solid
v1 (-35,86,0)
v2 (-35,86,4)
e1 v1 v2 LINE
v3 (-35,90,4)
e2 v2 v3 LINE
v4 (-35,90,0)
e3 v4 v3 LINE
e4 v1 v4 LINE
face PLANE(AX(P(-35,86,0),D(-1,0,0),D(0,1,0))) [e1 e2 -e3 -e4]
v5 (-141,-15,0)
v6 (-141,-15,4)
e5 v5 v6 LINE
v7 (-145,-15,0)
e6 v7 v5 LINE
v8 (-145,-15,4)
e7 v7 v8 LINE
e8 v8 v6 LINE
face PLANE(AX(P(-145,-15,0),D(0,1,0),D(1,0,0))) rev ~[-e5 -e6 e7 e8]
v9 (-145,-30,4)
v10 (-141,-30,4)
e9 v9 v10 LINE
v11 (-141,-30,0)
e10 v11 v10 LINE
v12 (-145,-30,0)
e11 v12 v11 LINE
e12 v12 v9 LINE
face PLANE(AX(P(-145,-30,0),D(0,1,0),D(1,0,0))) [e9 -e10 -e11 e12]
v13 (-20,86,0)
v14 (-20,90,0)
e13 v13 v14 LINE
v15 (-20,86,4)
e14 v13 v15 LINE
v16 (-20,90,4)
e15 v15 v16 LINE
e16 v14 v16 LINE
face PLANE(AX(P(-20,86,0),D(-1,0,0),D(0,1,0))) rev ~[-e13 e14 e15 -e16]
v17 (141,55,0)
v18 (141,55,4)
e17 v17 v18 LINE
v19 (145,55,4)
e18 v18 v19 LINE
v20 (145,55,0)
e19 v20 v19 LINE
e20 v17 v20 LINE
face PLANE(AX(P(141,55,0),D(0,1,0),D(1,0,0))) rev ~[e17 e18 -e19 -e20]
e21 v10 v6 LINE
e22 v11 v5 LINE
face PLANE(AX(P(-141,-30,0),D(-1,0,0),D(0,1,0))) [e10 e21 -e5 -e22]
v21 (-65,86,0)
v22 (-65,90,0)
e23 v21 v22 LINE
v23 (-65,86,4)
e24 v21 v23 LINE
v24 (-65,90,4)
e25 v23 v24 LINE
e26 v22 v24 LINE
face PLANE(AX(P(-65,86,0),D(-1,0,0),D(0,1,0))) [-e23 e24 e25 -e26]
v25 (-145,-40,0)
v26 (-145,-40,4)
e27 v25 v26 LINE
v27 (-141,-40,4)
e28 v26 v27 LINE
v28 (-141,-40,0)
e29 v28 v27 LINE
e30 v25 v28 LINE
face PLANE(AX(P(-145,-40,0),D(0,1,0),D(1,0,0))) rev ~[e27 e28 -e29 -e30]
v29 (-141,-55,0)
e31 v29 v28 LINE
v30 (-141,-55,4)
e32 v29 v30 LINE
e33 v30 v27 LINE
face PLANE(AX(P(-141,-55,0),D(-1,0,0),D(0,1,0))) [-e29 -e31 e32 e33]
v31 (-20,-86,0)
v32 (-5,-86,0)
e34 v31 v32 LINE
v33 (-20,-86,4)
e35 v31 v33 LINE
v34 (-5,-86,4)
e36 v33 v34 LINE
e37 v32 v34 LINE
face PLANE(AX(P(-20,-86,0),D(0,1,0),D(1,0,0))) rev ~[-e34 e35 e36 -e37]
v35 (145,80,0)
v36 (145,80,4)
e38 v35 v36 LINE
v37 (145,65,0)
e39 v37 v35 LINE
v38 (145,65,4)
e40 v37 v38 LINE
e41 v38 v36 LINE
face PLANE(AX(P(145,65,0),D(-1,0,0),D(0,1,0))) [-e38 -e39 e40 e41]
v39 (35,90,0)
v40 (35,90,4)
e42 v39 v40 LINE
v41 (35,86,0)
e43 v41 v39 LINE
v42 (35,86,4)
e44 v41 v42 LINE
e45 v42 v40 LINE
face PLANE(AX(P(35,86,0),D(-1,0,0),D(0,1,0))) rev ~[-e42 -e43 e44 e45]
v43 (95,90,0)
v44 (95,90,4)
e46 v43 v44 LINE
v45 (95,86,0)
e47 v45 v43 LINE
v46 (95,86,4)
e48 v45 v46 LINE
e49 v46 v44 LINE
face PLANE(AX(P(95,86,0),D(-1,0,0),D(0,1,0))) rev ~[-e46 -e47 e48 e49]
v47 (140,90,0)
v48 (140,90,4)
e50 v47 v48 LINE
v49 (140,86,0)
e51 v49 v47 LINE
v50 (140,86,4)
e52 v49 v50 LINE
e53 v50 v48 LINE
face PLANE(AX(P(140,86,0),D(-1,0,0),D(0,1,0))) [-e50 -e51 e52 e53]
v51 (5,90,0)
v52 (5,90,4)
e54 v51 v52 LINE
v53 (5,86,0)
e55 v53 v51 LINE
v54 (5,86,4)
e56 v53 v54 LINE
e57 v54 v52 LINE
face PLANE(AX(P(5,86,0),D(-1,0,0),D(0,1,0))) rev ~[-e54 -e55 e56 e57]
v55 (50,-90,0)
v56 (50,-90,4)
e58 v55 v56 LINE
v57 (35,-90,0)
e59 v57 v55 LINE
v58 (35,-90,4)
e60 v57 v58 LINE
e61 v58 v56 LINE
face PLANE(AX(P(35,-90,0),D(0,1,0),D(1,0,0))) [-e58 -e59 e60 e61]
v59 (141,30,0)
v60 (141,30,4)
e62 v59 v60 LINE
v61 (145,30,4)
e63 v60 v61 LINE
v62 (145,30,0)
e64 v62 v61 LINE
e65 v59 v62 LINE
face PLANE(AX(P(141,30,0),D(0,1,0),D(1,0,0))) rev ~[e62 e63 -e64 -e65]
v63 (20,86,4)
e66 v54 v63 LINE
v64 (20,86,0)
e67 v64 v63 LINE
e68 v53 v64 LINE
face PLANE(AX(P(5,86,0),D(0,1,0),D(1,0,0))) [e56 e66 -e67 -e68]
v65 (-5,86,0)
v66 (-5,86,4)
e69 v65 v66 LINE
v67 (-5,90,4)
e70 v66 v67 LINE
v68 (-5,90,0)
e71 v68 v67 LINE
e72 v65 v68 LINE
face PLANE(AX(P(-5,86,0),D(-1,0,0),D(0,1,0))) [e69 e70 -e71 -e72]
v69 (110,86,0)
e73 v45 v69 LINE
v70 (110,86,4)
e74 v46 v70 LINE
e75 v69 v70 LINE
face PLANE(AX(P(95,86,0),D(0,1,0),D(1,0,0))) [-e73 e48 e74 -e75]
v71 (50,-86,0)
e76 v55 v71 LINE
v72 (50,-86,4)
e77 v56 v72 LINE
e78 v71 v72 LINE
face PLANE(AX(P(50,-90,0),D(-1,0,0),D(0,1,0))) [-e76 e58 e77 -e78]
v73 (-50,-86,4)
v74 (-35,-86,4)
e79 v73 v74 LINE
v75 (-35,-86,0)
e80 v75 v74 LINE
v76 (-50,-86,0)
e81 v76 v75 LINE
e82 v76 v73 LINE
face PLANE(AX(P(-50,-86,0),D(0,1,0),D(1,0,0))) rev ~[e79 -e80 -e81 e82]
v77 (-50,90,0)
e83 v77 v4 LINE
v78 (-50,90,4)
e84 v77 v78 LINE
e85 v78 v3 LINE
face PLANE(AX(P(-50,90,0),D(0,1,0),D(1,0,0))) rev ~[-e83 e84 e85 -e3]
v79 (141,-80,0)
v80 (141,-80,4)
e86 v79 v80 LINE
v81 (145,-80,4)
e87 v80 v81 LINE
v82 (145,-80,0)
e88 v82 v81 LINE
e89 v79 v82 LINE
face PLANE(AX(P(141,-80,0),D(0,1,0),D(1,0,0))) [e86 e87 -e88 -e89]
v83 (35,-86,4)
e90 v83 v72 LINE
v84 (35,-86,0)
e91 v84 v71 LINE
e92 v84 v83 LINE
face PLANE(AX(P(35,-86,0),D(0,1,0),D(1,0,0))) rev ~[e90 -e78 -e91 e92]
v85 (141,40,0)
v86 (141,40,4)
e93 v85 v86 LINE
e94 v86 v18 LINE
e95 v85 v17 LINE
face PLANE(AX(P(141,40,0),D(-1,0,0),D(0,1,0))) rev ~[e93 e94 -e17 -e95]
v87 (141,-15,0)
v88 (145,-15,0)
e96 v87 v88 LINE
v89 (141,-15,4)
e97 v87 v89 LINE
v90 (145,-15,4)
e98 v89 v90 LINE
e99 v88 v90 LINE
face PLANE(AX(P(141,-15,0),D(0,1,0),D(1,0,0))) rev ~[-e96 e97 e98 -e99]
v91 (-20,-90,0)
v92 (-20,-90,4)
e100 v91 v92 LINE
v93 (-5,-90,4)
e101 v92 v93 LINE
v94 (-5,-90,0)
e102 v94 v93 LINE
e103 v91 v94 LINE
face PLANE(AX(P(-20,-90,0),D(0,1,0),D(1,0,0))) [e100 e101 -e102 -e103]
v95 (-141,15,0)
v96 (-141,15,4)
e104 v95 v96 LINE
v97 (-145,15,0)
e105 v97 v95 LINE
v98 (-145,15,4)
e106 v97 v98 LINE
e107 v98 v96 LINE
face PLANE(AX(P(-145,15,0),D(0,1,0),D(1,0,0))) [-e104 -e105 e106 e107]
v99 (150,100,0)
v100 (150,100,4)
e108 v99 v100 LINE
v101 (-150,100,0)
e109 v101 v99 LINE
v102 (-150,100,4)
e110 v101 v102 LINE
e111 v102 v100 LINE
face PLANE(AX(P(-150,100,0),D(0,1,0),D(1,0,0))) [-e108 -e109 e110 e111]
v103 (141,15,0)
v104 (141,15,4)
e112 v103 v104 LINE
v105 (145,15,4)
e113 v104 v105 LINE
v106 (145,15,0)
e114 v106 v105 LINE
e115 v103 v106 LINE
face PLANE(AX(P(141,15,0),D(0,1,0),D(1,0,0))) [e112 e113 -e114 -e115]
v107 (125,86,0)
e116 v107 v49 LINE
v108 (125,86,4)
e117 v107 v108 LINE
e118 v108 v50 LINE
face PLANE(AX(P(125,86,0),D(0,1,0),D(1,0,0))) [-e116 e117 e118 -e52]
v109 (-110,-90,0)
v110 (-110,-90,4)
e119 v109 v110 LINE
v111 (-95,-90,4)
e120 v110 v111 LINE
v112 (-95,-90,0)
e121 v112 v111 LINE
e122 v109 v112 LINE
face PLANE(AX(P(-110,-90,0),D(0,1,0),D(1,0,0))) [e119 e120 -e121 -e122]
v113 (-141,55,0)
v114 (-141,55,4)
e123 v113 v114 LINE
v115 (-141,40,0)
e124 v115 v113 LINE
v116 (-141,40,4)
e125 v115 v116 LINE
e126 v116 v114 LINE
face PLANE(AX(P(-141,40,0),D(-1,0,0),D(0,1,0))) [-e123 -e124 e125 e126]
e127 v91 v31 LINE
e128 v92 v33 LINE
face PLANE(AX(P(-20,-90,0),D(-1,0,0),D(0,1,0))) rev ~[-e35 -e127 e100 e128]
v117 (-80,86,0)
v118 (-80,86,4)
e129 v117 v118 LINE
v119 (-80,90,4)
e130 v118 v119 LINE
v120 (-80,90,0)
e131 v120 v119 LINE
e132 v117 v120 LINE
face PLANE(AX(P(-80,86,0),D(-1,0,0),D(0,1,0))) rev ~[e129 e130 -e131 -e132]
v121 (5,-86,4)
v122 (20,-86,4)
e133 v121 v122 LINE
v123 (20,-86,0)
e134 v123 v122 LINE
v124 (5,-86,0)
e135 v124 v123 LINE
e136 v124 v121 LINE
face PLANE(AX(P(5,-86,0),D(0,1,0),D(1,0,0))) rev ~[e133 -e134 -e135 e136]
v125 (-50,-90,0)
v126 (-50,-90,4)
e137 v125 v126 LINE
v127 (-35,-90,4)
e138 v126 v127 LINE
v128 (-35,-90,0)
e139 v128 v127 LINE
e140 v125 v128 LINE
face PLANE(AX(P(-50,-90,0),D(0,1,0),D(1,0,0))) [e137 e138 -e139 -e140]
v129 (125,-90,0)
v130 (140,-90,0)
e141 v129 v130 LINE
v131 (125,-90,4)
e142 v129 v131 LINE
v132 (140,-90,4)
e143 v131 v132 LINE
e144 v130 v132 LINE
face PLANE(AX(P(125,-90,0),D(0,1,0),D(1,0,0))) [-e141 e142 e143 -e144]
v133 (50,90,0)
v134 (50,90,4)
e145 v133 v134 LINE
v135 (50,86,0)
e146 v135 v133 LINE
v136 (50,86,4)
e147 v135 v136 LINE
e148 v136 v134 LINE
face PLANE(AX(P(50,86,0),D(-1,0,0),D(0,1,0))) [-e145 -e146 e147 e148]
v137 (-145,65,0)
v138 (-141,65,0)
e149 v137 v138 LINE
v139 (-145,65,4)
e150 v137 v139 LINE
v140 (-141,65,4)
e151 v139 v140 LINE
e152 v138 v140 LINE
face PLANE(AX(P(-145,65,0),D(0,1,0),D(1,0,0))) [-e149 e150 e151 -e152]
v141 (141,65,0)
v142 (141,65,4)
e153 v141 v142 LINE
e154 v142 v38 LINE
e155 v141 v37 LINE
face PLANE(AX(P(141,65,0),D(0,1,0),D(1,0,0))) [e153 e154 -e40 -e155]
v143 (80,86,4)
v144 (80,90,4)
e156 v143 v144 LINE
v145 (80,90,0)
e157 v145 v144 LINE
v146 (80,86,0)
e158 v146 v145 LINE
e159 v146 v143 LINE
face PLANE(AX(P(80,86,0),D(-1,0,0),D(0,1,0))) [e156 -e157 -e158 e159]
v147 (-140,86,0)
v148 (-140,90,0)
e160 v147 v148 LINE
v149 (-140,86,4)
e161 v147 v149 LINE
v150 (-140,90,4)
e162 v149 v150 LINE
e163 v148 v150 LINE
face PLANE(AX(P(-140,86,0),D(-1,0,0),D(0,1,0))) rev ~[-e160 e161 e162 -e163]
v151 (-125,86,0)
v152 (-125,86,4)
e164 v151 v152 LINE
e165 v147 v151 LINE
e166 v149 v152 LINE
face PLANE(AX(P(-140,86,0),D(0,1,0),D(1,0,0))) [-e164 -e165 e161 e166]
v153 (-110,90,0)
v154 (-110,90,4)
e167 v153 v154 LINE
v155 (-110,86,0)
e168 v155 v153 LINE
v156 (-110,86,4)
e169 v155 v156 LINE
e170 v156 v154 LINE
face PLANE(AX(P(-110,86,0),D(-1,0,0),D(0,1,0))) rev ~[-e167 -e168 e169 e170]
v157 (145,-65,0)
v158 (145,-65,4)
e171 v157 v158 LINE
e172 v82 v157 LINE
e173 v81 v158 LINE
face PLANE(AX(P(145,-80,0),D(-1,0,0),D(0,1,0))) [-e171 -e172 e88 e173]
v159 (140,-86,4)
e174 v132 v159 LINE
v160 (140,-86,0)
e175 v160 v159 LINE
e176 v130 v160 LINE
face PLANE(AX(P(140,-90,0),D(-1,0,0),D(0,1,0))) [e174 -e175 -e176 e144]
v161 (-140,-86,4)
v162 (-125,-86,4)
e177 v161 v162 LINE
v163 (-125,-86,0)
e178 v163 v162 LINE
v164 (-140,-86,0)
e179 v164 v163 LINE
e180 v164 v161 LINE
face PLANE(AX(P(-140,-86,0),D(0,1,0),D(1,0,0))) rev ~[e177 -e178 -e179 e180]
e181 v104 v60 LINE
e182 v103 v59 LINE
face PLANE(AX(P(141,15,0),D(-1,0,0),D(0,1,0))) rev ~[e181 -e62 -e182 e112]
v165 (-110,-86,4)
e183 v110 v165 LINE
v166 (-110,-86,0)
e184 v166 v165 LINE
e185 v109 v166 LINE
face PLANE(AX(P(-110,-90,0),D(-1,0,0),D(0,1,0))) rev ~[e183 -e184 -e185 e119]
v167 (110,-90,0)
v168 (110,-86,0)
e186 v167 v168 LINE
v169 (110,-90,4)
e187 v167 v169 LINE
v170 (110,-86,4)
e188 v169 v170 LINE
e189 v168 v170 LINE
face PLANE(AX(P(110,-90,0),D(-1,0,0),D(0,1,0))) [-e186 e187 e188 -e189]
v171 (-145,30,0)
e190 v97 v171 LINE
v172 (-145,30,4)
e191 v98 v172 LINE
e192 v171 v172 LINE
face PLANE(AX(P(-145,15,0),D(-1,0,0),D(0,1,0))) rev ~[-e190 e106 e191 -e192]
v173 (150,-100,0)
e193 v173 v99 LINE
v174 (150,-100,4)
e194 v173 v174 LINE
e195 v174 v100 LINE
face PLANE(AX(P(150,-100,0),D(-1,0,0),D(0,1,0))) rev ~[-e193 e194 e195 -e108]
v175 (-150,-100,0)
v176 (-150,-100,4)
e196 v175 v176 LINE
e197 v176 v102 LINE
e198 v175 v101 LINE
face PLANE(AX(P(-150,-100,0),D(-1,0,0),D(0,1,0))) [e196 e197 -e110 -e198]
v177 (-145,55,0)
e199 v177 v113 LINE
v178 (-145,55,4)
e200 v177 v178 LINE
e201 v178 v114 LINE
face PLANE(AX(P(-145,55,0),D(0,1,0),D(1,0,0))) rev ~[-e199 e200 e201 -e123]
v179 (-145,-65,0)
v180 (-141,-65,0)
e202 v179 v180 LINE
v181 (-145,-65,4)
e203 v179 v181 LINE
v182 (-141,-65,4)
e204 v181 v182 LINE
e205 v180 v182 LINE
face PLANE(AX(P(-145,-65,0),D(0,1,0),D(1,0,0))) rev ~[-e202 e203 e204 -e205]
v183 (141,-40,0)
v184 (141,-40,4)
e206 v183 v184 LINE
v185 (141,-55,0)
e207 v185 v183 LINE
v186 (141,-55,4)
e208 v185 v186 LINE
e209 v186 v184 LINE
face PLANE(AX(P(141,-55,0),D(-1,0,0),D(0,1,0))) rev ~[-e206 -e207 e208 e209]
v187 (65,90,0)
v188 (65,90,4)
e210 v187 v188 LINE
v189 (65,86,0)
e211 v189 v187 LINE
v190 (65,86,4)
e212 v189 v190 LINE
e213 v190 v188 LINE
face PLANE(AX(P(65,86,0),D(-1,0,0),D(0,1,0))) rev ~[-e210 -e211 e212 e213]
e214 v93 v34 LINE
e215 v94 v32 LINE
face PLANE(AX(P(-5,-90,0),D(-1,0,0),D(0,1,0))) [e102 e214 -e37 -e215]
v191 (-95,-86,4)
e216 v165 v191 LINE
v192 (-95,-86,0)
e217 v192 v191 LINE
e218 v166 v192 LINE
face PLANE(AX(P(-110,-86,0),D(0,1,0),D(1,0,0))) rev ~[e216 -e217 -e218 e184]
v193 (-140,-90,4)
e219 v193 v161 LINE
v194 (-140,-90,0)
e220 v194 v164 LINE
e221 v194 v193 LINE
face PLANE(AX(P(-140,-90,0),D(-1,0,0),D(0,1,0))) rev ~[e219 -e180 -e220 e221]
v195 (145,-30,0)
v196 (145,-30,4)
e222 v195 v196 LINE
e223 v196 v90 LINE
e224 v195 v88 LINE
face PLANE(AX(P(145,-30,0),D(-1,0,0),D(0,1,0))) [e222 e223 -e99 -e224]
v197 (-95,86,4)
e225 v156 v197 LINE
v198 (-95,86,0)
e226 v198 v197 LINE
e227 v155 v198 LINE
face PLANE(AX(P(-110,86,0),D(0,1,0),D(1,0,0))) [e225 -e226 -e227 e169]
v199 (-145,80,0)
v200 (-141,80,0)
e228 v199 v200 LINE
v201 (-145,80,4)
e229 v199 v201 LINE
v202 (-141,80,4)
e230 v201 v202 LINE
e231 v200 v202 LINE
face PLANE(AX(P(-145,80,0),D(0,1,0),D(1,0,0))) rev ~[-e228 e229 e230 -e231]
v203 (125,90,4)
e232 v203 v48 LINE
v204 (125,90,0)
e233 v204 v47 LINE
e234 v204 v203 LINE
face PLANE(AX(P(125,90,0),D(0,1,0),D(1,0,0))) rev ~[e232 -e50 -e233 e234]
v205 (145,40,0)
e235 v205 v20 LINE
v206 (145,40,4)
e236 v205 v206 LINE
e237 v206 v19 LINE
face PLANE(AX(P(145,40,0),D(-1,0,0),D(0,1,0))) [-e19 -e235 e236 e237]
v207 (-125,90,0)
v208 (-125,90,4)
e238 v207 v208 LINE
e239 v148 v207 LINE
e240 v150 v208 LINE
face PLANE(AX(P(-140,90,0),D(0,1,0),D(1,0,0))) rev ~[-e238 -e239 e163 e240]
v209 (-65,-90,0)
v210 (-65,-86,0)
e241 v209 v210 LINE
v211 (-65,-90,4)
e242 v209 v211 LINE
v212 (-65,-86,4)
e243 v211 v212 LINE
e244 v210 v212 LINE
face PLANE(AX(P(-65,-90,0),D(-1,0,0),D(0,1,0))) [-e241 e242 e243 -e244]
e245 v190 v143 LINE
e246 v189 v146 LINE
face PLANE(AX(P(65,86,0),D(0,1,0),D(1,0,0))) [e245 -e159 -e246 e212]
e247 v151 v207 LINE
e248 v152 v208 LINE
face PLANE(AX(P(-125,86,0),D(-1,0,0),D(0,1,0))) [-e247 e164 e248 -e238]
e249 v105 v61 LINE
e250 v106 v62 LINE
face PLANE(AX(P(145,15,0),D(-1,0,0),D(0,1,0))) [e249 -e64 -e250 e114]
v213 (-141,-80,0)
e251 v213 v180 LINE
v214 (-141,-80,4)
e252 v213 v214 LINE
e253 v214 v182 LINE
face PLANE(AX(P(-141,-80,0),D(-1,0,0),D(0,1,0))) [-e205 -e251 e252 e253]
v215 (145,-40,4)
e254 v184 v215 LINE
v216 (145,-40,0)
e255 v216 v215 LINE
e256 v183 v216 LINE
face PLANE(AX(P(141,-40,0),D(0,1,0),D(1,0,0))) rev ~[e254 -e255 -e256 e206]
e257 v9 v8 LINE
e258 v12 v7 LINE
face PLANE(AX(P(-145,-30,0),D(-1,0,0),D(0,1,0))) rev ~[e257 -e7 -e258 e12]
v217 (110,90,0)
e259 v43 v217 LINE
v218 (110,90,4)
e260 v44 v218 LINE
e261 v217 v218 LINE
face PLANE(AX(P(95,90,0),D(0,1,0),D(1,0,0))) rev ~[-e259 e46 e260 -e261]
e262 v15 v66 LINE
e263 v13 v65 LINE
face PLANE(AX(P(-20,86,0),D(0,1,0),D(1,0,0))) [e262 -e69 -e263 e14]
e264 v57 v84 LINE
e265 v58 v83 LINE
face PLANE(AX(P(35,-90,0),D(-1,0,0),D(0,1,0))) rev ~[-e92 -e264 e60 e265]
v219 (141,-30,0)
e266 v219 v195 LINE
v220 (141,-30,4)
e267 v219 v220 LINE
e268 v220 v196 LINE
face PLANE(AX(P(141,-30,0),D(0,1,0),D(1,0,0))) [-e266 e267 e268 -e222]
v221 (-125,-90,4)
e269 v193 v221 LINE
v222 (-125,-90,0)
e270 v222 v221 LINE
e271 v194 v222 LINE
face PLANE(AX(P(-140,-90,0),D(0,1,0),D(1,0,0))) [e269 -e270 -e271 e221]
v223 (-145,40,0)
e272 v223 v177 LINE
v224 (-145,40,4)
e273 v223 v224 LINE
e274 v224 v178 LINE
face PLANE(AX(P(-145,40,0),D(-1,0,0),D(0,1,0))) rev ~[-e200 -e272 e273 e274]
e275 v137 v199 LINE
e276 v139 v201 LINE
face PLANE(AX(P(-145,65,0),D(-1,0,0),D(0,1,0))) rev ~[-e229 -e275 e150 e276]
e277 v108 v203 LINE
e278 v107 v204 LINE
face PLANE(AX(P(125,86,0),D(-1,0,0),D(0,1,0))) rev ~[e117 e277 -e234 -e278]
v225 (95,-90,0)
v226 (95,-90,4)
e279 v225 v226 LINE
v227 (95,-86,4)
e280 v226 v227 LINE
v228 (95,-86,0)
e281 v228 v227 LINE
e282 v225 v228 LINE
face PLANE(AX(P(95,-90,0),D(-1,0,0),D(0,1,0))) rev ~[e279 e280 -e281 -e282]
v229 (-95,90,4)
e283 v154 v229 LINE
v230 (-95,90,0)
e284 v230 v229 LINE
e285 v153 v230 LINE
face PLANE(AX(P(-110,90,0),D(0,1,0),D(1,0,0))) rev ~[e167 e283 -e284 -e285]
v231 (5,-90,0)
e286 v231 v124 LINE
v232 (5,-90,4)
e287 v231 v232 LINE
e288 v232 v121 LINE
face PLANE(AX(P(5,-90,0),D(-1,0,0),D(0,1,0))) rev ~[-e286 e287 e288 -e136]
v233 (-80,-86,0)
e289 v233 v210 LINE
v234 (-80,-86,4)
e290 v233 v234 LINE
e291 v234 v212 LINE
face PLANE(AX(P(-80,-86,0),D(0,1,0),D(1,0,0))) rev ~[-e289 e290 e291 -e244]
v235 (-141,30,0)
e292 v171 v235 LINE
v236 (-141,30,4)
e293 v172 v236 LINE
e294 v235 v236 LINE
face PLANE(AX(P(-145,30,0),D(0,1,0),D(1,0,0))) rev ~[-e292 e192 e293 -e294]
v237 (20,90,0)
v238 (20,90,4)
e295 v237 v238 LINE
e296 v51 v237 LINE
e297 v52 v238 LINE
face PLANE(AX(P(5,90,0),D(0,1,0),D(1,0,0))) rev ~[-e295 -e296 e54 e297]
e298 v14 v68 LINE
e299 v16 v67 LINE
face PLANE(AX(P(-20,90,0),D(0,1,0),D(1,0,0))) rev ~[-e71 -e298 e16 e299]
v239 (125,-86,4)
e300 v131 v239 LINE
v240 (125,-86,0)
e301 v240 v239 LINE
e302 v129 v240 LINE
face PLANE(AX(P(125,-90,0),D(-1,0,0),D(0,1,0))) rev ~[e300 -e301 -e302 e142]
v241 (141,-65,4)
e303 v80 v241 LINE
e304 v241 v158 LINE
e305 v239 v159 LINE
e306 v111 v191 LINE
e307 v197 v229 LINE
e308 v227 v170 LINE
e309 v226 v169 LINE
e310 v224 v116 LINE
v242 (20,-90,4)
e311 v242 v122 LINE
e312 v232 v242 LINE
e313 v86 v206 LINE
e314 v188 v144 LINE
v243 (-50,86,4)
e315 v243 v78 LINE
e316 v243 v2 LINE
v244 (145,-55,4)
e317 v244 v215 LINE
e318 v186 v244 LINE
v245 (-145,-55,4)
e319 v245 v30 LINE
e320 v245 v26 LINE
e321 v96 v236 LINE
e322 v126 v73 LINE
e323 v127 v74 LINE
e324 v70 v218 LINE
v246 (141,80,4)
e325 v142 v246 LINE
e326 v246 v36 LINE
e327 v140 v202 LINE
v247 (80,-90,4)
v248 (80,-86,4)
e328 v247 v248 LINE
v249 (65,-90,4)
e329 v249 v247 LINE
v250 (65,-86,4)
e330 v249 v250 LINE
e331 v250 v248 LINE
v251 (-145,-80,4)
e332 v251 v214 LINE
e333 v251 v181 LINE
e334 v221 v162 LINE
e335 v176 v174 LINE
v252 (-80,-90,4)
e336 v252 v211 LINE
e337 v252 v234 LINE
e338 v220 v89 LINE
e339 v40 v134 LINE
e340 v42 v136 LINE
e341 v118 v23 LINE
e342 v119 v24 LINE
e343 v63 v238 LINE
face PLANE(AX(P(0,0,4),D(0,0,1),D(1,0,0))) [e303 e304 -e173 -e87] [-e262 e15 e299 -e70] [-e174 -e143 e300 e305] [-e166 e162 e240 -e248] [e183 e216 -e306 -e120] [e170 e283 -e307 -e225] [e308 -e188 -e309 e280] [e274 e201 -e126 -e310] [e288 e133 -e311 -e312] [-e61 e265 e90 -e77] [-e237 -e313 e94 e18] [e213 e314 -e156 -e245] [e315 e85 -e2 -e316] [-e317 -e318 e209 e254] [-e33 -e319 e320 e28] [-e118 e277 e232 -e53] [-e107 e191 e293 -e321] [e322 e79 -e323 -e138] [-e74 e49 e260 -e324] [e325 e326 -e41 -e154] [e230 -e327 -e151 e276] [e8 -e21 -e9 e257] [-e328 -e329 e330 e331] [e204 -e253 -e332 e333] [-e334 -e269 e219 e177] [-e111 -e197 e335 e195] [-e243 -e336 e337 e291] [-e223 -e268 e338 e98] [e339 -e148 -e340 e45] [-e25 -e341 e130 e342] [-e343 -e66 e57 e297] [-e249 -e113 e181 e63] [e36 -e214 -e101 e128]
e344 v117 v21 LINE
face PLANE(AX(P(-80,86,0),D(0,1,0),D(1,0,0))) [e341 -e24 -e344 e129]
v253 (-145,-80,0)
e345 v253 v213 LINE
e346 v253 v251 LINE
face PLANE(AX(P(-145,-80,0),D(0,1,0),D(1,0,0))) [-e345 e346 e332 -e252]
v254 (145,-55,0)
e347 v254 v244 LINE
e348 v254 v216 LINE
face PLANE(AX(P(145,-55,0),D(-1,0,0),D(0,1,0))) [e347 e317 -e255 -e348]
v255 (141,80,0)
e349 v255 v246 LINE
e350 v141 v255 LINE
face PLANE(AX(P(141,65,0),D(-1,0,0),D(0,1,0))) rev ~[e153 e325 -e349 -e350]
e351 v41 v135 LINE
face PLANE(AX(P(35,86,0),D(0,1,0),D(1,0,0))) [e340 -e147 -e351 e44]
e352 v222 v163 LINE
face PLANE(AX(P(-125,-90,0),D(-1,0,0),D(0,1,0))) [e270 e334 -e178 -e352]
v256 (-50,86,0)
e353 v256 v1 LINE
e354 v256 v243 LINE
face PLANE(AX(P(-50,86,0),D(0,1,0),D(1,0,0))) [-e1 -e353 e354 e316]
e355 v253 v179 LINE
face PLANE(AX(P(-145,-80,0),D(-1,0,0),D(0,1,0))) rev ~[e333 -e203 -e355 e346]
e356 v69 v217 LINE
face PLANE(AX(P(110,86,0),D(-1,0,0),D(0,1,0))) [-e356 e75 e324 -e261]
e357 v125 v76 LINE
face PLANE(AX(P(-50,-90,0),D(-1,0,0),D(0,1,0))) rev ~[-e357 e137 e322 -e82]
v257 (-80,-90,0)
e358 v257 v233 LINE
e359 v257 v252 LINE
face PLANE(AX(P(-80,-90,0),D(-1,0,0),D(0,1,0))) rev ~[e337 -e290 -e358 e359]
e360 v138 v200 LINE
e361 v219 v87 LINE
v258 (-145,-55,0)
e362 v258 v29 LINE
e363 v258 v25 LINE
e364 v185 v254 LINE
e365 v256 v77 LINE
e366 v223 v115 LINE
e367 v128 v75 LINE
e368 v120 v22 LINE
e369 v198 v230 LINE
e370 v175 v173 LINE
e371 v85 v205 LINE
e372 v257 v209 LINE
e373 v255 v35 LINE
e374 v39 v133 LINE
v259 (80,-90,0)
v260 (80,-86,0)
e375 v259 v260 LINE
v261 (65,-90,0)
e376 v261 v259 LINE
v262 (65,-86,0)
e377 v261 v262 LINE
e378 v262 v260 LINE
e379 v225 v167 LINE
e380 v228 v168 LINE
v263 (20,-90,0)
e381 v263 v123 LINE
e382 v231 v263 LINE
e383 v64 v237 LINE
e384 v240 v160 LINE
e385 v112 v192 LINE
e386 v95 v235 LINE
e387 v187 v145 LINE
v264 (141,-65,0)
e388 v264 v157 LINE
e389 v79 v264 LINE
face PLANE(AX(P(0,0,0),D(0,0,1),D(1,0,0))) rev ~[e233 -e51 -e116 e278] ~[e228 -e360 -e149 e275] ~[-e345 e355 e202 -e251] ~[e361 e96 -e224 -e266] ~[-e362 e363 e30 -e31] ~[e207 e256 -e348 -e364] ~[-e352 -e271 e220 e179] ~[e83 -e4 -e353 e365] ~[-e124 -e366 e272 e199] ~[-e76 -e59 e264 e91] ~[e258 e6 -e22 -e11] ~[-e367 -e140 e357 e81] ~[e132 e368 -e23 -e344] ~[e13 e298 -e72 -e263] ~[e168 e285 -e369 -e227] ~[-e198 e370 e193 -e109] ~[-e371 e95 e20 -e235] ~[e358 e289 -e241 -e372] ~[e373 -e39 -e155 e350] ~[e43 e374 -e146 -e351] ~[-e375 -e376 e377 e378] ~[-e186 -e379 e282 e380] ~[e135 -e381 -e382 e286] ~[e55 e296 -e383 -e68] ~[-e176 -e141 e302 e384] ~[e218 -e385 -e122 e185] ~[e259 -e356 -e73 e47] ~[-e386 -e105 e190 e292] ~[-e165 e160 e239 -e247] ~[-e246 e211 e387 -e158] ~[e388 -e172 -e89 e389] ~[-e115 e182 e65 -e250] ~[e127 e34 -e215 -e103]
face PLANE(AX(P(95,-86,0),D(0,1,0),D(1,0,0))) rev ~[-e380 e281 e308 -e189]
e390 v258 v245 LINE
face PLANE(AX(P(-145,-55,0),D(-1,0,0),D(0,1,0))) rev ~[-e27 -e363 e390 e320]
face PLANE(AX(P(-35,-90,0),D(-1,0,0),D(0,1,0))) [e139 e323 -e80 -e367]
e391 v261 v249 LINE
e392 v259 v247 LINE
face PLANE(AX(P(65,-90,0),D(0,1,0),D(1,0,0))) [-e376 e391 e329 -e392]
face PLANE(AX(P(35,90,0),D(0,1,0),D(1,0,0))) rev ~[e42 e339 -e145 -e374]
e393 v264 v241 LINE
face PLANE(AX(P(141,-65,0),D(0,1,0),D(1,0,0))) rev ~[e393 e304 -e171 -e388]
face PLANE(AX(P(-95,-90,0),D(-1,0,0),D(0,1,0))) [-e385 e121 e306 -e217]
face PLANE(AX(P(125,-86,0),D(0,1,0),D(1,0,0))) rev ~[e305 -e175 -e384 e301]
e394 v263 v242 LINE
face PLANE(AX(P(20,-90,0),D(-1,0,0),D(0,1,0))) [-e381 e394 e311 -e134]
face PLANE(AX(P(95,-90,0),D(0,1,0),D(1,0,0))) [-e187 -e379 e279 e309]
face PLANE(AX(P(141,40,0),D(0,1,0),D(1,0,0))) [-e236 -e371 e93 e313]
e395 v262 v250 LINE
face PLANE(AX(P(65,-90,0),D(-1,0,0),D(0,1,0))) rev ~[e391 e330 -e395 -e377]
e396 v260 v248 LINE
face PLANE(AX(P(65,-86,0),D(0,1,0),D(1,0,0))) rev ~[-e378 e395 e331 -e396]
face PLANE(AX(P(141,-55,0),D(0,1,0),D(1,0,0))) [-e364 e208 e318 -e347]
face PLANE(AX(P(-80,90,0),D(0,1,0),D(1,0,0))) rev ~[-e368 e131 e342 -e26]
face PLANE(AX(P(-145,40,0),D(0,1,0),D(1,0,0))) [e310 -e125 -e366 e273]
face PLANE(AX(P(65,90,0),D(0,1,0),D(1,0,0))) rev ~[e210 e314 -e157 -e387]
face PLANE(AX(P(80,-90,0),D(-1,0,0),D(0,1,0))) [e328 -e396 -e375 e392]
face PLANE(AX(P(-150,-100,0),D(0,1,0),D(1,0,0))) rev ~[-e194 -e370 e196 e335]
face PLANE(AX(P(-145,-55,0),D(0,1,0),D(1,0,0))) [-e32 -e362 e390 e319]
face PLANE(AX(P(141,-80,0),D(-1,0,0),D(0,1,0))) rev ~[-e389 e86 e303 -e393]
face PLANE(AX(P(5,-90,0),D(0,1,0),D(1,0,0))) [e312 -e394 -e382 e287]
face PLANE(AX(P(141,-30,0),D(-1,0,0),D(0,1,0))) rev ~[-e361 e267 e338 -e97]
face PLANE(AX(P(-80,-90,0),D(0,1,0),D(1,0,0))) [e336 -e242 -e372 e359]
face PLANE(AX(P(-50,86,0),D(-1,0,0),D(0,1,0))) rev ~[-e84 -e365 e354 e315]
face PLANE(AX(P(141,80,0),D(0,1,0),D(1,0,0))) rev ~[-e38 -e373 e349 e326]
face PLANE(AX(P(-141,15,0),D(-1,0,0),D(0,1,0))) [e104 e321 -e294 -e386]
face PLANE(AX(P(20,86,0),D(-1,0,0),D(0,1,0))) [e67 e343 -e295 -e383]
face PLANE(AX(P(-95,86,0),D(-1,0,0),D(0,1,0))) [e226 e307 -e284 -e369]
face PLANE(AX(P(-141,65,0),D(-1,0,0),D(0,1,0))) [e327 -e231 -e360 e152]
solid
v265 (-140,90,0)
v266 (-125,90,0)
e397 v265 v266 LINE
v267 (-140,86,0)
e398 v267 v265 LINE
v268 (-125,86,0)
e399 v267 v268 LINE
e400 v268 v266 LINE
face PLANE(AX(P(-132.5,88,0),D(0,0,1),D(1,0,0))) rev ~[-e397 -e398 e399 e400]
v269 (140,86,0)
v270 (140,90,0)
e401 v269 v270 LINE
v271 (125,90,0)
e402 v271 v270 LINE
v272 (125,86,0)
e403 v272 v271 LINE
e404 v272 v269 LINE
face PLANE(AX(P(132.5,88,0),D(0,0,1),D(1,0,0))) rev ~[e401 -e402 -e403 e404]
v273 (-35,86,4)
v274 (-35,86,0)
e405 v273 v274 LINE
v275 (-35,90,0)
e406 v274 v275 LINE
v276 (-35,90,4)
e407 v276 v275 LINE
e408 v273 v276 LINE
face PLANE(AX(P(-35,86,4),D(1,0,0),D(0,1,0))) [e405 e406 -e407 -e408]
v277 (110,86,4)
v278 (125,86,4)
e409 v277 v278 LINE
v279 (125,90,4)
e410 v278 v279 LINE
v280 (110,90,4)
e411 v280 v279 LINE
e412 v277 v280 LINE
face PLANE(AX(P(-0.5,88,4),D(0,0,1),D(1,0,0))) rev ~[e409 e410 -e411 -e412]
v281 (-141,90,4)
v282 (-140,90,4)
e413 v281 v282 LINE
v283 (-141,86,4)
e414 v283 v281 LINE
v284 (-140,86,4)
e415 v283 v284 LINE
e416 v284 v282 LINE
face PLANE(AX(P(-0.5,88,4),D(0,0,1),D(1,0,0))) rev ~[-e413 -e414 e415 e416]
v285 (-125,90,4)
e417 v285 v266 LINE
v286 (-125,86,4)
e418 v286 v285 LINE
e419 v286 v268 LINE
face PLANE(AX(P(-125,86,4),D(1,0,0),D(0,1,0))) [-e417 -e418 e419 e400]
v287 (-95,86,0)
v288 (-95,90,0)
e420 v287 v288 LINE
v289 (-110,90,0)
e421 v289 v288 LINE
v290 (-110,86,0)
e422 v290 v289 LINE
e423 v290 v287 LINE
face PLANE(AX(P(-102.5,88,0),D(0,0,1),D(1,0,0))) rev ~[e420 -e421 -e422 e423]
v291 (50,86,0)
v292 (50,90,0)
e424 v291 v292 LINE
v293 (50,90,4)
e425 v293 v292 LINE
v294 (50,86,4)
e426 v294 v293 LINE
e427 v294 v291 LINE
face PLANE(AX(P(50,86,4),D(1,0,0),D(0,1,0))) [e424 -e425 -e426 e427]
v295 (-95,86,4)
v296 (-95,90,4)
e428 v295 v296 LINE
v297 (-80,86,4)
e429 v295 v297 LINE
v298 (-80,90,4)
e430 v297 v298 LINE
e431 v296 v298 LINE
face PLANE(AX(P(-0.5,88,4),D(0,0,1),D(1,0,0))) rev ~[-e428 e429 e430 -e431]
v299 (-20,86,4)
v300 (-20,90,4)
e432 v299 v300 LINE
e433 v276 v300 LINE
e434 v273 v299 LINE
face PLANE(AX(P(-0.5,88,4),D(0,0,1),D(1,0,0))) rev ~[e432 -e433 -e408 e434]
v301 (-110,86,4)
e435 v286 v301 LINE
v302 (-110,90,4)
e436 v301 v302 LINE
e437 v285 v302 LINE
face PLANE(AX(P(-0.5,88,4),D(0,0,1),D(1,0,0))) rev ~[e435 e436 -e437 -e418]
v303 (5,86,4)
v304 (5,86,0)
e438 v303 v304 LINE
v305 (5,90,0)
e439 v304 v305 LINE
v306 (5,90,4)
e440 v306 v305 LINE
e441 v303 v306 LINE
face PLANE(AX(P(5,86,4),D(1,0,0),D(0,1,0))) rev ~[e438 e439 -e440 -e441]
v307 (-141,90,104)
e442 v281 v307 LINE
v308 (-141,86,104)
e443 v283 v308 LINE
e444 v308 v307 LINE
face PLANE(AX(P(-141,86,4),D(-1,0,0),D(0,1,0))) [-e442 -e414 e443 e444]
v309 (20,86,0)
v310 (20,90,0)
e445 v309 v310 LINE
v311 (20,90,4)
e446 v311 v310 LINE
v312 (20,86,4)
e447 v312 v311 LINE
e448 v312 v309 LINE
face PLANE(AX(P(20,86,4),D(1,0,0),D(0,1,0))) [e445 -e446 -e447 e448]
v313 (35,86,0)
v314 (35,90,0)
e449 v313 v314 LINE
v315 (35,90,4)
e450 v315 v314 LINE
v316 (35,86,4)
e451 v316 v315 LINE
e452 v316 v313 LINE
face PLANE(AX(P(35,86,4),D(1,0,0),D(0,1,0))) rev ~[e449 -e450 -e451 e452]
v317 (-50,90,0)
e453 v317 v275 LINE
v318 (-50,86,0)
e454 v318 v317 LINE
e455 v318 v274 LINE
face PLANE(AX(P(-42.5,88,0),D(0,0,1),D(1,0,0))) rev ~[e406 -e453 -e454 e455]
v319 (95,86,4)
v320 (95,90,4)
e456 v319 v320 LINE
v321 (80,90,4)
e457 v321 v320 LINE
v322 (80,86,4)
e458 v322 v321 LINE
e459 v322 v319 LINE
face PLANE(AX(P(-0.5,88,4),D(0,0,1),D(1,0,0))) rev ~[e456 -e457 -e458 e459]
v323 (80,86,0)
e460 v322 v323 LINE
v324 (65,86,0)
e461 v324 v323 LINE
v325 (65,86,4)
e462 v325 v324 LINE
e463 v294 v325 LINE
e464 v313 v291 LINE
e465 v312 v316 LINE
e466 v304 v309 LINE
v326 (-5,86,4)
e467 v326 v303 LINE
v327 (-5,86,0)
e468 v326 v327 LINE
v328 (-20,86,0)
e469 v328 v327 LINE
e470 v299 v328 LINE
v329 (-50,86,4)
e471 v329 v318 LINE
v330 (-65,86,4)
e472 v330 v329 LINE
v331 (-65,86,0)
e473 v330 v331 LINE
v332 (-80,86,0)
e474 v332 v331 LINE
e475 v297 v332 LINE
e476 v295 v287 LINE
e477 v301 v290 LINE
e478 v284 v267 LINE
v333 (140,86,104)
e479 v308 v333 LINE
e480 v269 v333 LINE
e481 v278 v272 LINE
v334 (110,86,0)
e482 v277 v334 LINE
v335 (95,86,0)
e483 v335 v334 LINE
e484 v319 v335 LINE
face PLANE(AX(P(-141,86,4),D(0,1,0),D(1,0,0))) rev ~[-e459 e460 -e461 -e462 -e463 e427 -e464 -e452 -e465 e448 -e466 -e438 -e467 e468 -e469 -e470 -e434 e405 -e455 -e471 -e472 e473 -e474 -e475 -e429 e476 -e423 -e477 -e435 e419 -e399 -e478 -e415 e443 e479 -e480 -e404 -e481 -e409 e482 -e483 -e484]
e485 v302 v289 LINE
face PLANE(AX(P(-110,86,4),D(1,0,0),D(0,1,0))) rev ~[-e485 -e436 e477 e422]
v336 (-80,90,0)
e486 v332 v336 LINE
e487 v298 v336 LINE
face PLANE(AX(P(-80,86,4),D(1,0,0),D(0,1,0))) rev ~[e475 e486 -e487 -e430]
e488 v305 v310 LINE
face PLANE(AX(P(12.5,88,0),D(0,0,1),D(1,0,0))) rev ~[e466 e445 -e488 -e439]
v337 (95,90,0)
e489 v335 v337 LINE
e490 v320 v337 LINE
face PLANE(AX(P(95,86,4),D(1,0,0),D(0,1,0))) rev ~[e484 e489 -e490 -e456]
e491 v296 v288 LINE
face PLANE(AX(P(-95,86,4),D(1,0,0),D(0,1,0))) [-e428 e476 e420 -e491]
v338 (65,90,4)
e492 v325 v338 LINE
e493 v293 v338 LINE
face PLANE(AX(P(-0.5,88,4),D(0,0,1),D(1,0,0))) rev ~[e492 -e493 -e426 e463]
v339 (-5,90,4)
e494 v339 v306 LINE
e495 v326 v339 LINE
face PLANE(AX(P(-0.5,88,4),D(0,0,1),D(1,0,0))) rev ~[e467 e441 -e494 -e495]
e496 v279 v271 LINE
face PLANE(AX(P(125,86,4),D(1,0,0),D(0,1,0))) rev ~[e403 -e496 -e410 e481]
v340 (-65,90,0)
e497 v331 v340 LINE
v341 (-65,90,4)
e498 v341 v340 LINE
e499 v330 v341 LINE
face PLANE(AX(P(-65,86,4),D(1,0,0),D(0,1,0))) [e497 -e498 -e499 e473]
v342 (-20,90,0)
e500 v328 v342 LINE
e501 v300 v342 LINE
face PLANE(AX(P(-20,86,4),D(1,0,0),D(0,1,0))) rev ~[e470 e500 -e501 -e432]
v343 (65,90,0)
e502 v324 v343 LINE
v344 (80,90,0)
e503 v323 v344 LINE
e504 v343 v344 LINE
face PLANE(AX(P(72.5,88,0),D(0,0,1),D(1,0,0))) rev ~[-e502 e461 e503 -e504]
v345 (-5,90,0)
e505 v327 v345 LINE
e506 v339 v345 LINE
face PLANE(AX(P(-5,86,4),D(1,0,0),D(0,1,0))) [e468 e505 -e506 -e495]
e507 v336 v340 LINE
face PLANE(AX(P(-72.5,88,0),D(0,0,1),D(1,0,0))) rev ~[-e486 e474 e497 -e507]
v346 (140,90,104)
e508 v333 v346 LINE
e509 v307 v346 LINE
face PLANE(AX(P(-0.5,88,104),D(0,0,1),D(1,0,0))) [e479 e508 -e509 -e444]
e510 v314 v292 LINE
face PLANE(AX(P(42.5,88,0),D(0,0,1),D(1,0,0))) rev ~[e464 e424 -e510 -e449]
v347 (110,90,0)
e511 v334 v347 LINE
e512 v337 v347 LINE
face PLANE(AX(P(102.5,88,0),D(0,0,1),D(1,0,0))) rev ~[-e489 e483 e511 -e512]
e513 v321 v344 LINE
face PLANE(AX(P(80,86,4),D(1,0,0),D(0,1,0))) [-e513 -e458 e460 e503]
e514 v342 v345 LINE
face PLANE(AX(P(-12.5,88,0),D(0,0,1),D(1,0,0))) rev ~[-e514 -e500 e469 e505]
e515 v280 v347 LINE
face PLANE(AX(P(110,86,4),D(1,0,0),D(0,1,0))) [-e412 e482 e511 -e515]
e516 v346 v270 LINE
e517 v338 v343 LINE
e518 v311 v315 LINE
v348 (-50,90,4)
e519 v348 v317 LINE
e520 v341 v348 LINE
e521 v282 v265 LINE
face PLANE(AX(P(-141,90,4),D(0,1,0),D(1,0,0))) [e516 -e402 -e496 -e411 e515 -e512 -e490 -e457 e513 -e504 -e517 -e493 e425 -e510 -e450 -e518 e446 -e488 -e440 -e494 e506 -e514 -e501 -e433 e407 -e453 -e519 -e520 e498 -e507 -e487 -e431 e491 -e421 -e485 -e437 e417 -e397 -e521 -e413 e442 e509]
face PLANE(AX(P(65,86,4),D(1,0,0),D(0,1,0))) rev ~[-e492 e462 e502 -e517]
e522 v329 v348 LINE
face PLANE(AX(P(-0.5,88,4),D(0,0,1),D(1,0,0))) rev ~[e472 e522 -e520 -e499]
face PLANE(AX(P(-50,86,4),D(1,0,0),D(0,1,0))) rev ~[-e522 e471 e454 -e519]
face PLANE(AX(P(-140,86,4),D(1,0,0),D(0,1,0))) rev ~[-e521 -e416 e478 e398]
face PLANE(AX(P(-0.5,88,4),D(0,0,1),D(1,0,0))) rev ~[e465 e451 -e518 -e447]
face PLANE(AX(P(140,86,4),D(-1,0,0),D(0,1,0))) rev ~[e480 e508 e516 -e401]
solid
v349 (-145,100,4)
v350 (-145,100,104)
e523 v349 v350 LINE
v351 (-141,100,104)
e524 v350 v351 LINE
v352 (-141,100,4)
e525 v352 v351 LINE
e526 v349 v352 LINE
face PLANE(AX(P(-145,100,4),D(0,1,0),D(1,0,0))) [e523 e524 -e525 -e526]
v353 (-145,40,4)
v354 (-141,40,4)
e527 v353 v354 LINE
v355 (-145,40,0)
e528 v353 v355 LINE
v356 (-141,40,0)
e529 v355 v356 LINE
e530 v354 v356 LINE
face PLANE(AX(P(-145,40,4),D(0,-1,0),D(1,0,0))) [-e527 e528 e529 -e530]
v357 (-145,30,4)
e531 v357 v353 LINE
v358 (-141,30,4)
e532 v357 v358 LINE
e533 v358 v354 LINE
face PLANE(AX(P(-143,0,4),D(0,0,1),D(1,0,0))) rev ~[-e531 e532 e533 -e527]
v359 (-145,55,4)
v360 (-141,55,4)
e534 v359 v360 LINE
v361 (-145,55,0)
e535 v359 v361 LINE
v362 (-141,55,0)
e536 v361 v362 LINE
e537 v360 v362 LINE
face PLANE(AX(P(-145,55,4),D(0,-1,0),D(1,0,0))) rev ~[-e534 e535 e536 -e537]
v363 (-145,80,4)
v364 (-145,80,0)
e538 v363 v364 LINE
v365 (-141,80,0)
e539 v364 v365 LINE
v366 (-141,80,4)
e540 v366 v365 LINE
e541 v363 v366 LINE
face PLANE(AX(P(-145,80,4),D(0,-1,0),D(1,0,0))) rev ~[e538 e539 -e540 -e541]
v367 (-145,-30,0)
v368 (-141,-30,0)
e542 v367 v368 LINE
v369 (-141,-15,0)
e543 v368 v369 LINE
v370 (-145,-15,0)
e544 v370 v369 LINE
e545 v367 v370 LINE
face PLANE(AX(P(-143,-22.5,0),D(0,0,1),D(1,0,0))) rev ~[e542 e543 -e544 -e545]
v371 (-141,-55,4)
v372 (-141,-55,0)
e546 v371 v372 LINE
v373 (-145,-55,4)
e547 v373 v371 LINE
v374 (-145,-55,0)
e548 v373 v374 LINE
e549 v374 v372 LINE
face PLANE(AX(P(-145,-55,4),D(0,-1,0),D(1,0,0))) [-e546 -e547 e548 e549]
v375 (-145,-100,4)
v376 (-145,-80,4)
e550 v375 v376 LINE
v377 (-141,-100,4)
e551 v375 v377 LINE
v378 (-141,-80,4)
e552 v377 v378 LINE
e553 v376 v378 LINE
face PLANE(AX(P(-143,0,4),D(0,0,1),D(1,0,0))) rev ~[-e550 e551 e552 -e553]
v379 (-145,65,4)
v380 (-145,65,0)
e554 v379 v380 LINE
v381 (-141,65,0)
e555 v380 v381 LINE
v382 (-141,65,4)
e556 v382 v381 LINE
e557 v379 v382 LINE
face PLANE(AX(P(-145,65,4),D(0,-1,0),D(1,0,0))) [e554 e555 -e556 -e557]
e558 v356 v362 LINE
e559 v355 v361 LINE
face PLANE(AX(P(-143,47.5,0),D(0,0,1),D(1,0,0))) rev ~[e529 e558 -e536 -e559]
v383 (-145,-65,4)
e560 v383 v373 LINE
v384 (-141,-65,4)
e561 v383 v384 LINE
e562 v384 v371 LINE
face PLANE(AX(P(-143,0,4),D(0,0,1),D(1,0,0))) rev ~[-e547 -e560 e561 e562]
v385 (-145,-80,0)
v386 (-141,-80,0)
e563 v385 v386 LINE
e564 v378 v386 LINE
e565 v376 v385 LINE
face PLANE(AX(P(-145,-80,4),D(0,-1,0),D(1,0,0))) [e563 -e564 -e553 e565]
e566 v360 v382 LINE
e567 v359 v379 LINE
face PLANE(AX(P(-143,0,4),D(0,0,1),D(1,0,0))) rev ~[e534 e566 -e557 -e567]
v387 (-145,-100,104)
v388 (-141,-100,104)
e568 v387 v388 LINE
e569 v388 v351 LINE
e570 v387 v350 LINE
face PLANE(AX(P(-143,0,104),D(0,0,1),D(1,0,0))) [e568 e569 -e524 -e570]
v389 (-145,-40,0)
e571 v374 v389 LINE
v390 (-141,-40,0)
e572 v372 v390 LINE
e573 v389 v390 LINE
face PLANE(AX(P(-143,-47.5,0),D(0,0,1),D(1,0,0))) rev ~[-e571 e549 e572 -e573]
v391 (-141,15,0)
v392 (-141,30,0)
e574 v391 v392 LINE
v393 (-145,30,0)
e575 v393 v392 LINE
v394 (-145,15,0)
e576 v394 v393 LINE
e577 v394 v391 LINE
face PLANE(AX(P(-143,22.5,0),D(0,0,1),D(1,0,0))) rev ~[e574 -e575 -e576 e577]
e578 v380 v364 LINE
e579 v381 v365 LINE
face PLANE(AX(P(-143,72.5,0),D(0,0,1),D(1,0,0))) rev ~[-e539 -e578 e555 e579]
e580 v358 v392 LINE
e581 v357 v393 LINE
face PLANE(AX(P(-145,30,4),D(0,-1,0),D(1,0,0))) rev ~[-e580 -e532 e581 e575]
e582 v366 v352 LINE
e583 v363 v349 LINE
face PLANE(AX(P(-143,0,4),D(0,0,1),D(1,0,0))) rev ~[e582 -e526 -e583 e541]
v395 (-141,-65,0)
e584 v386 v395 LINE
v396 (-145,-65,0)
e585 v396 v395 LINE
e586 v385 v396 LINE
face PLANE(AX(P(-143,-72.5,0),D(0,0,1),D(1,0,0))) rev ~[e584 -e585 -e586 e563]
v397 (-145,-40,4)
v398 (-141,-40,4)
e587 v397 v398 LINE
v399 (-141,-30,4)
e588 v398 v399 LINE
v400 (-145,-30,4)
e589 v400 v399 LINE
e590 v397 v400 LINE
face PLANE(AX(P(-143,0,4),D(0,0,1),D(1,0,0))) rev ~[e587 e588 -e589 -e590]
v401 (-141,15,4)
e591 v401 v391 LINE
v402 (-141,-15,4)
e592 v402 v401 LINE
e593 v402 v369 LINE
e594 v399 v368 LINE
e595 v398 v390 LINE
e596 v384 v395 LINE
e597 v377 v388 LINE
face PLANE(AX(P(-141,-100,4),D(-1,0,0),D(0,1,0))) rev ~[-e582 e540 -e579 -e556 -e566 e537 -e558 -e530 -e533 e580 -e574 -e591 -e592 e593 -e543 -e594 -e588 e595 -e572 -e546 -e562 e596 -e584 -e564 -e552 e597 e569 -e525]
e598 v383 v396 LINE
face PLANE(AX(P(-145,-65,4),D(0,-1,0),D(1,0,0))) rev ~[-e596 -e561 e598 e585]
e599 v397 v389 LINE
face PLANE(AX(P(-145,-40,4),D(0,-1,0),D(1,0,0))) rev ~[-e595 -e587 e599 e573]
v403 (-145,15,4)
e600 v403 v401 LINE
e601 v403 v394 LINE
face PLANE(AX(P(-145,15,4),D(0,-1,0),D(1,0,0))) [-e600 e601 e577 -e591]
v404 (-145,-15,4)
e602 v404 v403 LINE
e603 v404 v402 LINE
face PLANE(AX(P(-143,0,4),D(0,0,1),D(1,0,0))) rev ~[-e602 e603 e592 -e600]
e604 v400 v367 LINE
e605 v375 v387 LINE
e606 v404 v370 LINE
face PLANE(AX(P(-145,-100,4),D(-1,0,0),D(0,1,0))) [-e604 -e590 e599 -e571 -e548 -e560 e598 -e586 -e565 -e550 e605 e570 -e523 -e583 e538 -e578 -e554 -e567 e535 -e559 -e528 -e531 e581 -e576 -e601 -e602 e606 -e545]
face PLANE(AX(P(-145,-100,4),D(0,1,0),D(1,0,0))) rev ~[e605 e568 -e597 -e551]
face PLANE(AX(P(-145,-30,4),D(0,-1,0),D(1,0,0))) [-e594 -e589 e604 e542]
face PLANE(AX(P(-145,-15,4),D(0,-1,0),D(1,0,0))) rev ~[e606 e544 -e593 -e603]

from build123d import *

# Parameters (mm, degrees)
F1_W      = 300
F1_H      = 200
F1_W_2    = 15
F1_H_2    = 4
F1_W_3    = 4
F1_H_3    = 15
F2_DEPTH  = 4
F3_W      = 4
F3_H      = 15
F4_DEPTH  = 4
F5_W      = 4
F5_H      = 200
F6_DEPTH  = 100
F8_W      = 15
F8_H      = 4
F9_DEPTH  = 4
F10_W     = 281
F10_H     = 4
F11_DEPTH = 100


with BuildPart() as f2:
    # F1 (on Top) → F2 (new body)
    with BuildSketch(Plane.XY):
        Rectangle(F1_W, F1_H)
        with Locations((-132.5, -88)):
            Rectangle(F1_W_2, F1_H_2, mode=Mode.SUBTRACT)
        with Locations((-102.5, -88)):
            Rectangle(F1_W_2, F1_H_2, mode=Mode.SUBTRACT)
        with Locations((-143, -72.5)):
            Rectangle(F1_W_3, F1_H_3, mode=Mode.SUBTRACT)
        with Locations((-72.5, -88)):
            Rectangle(F1_W_2, F1_H_2, mode=Mode.SUBTRACT)
        with Locations((-42.5, -88)):
            Rectangle(F1_W_2, F1_H_2, mode=Mode.SUBTRACT)
        with Locations((-12.5, -88)):
            Rectangle(F1_W_2, F1_H_2, mode=Mode.SUBTRACT)
        with Locations((-143, -47.5)):
            Rectangle(F1_W_3, F1_H_3, mode=Mode.SUBTRACT)
        with Locations((-143, -22.5)):
            Rectangle(F1_W_3, F1_H_3, mode=Mode.SUBTRACT)
        with Locations((12.5, -88)):
            Rectangle(F1_W_2, F1_H_2, mode=Mode.SUBTRACT)
        with Locations((42.5, -88)):
            Rectangle(F1_W_2, F1_H_2, mode=Mode.SUBTRACT)
        with Locations((72.5, -88)):
            Rectangle(F1_W_2, F1_H_2, mode=Mode.SUBTRACT)
        with Locations((102.5, -88)):
            Rectangle(F1_W_2, F1_H_2, mode=Mode.SUBTRACT)
        with Locations((132.5, -88)):
            Rectangle(F1_W_2, F1_H_2, mode=Mode.SUBTRACT)
        with Locations((143, -72.5)):
            Rectangle(F1_W_3, F1_H_3, mode=Mode.SUBTRACT)
        with Locations((143, -47.5)):
            Rectangle(F1_W_3, F1_H_3, mode=Mode.SUBTRACT)
        with Locations((143, -22.5)):
            Rectangle(F1_W_3, F1_H_3, mode=Mode.SUBTRACT)
        with Locations((-143, 22.5)):
            Rectangle(F1_W_3, F1_H_3, mode=Mode.SUBTRACT)
        with Locations((-143, 47.5)):
            Rectangle(F1_W_3, F1_H_3, mode=Mode.SUBTRACT)
        with Locations((-143, 72.5)):
            Rectangle(F1_W_3, F1_H_3, mode=Mode.SUBTRACT)
        with Locations((-132.5, 88)):
            Rectangle(F1_W_2, F1_H_2, mode=Mode.SUBTRACT)
        with Locations((-102.5, 88)):
            Rectangle(F1_W_2, F1_H_2, mode=Mode.SUBTRACT)
        with Locations((-72.5, 88)):
            Rectangle(F1_W_2, F1_H_2, mode=Mode.SUBTRACT)
        with Locations((-42.5, 88)):
            Rectangle(F1_W_2, F1_H_2, mode=Mode.SUBTRACT)
        with Locations((-12.5, 88)):
            Rectangle(F1_W_2, F1_H_2, mode=Mode.SUBTRACT)
        with Locations((143, 22.5)):
            Rectangle(F1_W_3, F1_H_3, mode=Mode.SUBTRACT)
        with Locations((143, 47.5)):
            Rectangle(F1_W_3, F1_H_3, mode=Mode.SUBTRACT)
        with Locations((12.5, 88)):
            Rectangle(F1_W_2, F1_H_2, mode=Mode.SUBTRACT)
        with Locations((42.5, 88)):
            Rectangle(F1_W_2, F1_H_2, mode=Mode.SUBTRACT)
        with Locations((72.5, 88)):
            Rectangle(F1_W_2, F1_H_2, mode=Mode.SUBTRACT)
        with Locations((143, 72.5)):
            Rectangle(F1_W_3, F1_H_3, mode=Mode.SUBTRACT)
        with Locations((102.5, 88)):
            Rectangle(F1_W_2, F1_H_2, mode=Mode.SUBTRACT)
        with Locations((132.5, 88)):
            Rectangle(F1_W_2, F1_H_2, mode=Mode.SUBTRACT)
    extrude(amount=F2_DEPTH)


with BuildPart() as f4:
    # F3 (on face) → F4 (new body)
    with BuildSketch(Plane.XY.offset(4)):
        with Locations((-143, -72.5)):
            Rectangle(F3_W, F3_H)
    extrude(amount=-F4_DEPTH)



with BuildPart() as f4b:
    # F3 (on face) → F4, piece 2 (new body)
    with BuildSketch(Plane.XY.offset(4)):
        with Locations((-143, -47.5)):
            Rectangle(F3_W, F3_H)
    extrude(amount=-F4_DEPTH)


with BuildPart() as f4c:
    # F3 (on face) → F4, piece 3 (new body)
    with BuildSketch(Plane.XY.offset(4)):
        with Locations((-143, -22.5)):
            Rectangle(F3_W, F3_H)
    extrude(amount=-F4_DEPTH)


with BuildPart() as f4d:
    # F3 (on face) → F4, piece 4 (new body)
    with BuildSketch(Plane.XY.offset(4)):
        with Locations((-143, 22.5)):
            Rectangle(F3_W, F3_H)
    extrude(amount=-F4_DEPTH)


with BuildPart() as f4e:
    # F3 (on face) → F4, piece 5 (new body)
    with BuildSketch(Plane.XY.offset(4)):
        with Locations((-143, 47.5)):
            Rectangle(F3_W, F3_H)
    extrude(amount=-F4_DEPTH)


with BuildPart() as f4f:
    # F3 (on face) → F4, piece 6 (new body)
    with BuildSketch(Plane.XY.offset(4)):
        with Locations((-143, 72.5)):
            Rectangle(F3_W, F3_H)
    extrude(amount=-F4_DEPTH)


with BuildPart() as f4_1:
    add(f4.part)

    add(f4b.part)  # F6 merges F4b

    add(f4c.part)  # F6 merges F4c

    add(f4d.part)  # F6 merges F4d

    add(f4e.part)  # F6 merges F4e

    add(f4f.part)  # F6 merges F4f
    # F5 (on face) → F6 (join)
    with BuildSketch(Plane.XY.offset(4)):
        with Locations((-143, 0)):
            Rectangle(F5_W, F5_H)
    extrude(amount=F6_DEPTH)

    # F7: union 


with BuildPart() as f9:
    # F8 (on face) → F9 (new body)
    with BuildSketch(Plane.XY.offset(4)):
        with Locations((-132.5, 88)):
            Rectangle(F8_W, F8_H)
    extrude(amount=-F9_DEPTH)



with BuildPart() as f9b:
    # F8 (on face) → F9, piece 2 (new body)
    with BuildSketch(Plane.XY.offset(4)):
        with Locations((-102.5, 88)):
            Rectangle(F8_W, F8_H)
    extrude(amount=-F9_DEPTH)


with BuildPart() as f9c:
    # F8 (on face) → F9, piece 3 (new body)
    with BuildSketch(Plane.XY.offset(4)):
        with Locations((-72.5, 88)):
            Rectangle(F8_W, F8_H)
    extrude(amount=-F9_DEPTH)


with BuildPart() as f9d:
    # F8 (on face) → F9, piece 4 (new body)
    with BuildSketch(Plane.XY.offset(4)):
        with Locations((-42.5, 88)):
            Rectangle(F8_W, F8_H)
    extrude(amount=-F9_DEPTH)


with BuildPart() as f9e:
    # F8 (on face) → F9, piece 5 (new body)
    with BuildSketch(Plane.XY.offset(4)):
        with Locations((-12.5, 88)):
            Rectangle(F8_W, F8_H)
    extrude(amount=-F9_DEPTH)


with BuildPart() as f9f:
    # F8 (on face) → F9, piece 6 (new body)
    with BuildSketch(Plane.XY.offset(4)):
        with Locations((12.5, 88)):
            Rectangle(F8_W, F8_H)
    extrude(amount=-F9_DEPTH)


with BuildPart() as f9g:
    # F8 (on face) → F9, piece 7 (new body)
    with BuildSketch(Plane.XY.offset(4)):
        with Locations((42.5, 88)):
            Rectangle(F8_W, F8_H)
    extrude(amount=-F9_DEPTH)


with BuildPart() as f9h:
    # F8 (on face) → F9, piece 8 (new body)
    with BuildSketch(Plane.XY.offset(4)):
        with Locations((72.5, 88)):
            Rectangle(F8_W, F8_H)
    extrude(amount=-F9_DEPTH)


with BuildPart() as f9i:
    # F8 (on face) → F9, piece 9 (new body)
    with BuildSketch(Plane.XY.offset(4)):
        with Locations((102.5, 88)):
            Rectangle(F8_W, F8_H)
    extrude(amount=-F9_DEPTH)


with BuildPart() as f9j:
    # F8 (on face) → F9, piece 10 (new body)
    with BuildSketch(Plane.XY.offset(4)):
        with Locations((132.5, 88)):
            Rectangle(F8_W, F8_H)
    extrude(amount=-F9_DEPTH)


with BuildPart() as f9_1:
    add(f9.part)

    add(f9b.part)  # F11 merges F9b

    add(f9c.part)  # F11 merges F9c

    add(f9d.part)  # F11 merges F9d

    add(f9e.part)  # F11 merges F9e

    add(f9f.part)  # F11 merges F9f

    add(f9g.part)  # F11 merges F9g

    add(f9h.part)  # F11 merges F9h

    add(f9i.part)  # F11 merges F9i

    add(f9j.part)  # F11 merges F9j
    # F10 (on face) → F11 (join)
    with BuildSketch(Plane.XY.offset(4)):
        with Locations((-0.5, 88)):
            Rectangle(F10_W, F10_H)
    extrude(amount=F11_DEPTH)


solid = Compound([f2.part, f4_1.part, f9_1.part])
